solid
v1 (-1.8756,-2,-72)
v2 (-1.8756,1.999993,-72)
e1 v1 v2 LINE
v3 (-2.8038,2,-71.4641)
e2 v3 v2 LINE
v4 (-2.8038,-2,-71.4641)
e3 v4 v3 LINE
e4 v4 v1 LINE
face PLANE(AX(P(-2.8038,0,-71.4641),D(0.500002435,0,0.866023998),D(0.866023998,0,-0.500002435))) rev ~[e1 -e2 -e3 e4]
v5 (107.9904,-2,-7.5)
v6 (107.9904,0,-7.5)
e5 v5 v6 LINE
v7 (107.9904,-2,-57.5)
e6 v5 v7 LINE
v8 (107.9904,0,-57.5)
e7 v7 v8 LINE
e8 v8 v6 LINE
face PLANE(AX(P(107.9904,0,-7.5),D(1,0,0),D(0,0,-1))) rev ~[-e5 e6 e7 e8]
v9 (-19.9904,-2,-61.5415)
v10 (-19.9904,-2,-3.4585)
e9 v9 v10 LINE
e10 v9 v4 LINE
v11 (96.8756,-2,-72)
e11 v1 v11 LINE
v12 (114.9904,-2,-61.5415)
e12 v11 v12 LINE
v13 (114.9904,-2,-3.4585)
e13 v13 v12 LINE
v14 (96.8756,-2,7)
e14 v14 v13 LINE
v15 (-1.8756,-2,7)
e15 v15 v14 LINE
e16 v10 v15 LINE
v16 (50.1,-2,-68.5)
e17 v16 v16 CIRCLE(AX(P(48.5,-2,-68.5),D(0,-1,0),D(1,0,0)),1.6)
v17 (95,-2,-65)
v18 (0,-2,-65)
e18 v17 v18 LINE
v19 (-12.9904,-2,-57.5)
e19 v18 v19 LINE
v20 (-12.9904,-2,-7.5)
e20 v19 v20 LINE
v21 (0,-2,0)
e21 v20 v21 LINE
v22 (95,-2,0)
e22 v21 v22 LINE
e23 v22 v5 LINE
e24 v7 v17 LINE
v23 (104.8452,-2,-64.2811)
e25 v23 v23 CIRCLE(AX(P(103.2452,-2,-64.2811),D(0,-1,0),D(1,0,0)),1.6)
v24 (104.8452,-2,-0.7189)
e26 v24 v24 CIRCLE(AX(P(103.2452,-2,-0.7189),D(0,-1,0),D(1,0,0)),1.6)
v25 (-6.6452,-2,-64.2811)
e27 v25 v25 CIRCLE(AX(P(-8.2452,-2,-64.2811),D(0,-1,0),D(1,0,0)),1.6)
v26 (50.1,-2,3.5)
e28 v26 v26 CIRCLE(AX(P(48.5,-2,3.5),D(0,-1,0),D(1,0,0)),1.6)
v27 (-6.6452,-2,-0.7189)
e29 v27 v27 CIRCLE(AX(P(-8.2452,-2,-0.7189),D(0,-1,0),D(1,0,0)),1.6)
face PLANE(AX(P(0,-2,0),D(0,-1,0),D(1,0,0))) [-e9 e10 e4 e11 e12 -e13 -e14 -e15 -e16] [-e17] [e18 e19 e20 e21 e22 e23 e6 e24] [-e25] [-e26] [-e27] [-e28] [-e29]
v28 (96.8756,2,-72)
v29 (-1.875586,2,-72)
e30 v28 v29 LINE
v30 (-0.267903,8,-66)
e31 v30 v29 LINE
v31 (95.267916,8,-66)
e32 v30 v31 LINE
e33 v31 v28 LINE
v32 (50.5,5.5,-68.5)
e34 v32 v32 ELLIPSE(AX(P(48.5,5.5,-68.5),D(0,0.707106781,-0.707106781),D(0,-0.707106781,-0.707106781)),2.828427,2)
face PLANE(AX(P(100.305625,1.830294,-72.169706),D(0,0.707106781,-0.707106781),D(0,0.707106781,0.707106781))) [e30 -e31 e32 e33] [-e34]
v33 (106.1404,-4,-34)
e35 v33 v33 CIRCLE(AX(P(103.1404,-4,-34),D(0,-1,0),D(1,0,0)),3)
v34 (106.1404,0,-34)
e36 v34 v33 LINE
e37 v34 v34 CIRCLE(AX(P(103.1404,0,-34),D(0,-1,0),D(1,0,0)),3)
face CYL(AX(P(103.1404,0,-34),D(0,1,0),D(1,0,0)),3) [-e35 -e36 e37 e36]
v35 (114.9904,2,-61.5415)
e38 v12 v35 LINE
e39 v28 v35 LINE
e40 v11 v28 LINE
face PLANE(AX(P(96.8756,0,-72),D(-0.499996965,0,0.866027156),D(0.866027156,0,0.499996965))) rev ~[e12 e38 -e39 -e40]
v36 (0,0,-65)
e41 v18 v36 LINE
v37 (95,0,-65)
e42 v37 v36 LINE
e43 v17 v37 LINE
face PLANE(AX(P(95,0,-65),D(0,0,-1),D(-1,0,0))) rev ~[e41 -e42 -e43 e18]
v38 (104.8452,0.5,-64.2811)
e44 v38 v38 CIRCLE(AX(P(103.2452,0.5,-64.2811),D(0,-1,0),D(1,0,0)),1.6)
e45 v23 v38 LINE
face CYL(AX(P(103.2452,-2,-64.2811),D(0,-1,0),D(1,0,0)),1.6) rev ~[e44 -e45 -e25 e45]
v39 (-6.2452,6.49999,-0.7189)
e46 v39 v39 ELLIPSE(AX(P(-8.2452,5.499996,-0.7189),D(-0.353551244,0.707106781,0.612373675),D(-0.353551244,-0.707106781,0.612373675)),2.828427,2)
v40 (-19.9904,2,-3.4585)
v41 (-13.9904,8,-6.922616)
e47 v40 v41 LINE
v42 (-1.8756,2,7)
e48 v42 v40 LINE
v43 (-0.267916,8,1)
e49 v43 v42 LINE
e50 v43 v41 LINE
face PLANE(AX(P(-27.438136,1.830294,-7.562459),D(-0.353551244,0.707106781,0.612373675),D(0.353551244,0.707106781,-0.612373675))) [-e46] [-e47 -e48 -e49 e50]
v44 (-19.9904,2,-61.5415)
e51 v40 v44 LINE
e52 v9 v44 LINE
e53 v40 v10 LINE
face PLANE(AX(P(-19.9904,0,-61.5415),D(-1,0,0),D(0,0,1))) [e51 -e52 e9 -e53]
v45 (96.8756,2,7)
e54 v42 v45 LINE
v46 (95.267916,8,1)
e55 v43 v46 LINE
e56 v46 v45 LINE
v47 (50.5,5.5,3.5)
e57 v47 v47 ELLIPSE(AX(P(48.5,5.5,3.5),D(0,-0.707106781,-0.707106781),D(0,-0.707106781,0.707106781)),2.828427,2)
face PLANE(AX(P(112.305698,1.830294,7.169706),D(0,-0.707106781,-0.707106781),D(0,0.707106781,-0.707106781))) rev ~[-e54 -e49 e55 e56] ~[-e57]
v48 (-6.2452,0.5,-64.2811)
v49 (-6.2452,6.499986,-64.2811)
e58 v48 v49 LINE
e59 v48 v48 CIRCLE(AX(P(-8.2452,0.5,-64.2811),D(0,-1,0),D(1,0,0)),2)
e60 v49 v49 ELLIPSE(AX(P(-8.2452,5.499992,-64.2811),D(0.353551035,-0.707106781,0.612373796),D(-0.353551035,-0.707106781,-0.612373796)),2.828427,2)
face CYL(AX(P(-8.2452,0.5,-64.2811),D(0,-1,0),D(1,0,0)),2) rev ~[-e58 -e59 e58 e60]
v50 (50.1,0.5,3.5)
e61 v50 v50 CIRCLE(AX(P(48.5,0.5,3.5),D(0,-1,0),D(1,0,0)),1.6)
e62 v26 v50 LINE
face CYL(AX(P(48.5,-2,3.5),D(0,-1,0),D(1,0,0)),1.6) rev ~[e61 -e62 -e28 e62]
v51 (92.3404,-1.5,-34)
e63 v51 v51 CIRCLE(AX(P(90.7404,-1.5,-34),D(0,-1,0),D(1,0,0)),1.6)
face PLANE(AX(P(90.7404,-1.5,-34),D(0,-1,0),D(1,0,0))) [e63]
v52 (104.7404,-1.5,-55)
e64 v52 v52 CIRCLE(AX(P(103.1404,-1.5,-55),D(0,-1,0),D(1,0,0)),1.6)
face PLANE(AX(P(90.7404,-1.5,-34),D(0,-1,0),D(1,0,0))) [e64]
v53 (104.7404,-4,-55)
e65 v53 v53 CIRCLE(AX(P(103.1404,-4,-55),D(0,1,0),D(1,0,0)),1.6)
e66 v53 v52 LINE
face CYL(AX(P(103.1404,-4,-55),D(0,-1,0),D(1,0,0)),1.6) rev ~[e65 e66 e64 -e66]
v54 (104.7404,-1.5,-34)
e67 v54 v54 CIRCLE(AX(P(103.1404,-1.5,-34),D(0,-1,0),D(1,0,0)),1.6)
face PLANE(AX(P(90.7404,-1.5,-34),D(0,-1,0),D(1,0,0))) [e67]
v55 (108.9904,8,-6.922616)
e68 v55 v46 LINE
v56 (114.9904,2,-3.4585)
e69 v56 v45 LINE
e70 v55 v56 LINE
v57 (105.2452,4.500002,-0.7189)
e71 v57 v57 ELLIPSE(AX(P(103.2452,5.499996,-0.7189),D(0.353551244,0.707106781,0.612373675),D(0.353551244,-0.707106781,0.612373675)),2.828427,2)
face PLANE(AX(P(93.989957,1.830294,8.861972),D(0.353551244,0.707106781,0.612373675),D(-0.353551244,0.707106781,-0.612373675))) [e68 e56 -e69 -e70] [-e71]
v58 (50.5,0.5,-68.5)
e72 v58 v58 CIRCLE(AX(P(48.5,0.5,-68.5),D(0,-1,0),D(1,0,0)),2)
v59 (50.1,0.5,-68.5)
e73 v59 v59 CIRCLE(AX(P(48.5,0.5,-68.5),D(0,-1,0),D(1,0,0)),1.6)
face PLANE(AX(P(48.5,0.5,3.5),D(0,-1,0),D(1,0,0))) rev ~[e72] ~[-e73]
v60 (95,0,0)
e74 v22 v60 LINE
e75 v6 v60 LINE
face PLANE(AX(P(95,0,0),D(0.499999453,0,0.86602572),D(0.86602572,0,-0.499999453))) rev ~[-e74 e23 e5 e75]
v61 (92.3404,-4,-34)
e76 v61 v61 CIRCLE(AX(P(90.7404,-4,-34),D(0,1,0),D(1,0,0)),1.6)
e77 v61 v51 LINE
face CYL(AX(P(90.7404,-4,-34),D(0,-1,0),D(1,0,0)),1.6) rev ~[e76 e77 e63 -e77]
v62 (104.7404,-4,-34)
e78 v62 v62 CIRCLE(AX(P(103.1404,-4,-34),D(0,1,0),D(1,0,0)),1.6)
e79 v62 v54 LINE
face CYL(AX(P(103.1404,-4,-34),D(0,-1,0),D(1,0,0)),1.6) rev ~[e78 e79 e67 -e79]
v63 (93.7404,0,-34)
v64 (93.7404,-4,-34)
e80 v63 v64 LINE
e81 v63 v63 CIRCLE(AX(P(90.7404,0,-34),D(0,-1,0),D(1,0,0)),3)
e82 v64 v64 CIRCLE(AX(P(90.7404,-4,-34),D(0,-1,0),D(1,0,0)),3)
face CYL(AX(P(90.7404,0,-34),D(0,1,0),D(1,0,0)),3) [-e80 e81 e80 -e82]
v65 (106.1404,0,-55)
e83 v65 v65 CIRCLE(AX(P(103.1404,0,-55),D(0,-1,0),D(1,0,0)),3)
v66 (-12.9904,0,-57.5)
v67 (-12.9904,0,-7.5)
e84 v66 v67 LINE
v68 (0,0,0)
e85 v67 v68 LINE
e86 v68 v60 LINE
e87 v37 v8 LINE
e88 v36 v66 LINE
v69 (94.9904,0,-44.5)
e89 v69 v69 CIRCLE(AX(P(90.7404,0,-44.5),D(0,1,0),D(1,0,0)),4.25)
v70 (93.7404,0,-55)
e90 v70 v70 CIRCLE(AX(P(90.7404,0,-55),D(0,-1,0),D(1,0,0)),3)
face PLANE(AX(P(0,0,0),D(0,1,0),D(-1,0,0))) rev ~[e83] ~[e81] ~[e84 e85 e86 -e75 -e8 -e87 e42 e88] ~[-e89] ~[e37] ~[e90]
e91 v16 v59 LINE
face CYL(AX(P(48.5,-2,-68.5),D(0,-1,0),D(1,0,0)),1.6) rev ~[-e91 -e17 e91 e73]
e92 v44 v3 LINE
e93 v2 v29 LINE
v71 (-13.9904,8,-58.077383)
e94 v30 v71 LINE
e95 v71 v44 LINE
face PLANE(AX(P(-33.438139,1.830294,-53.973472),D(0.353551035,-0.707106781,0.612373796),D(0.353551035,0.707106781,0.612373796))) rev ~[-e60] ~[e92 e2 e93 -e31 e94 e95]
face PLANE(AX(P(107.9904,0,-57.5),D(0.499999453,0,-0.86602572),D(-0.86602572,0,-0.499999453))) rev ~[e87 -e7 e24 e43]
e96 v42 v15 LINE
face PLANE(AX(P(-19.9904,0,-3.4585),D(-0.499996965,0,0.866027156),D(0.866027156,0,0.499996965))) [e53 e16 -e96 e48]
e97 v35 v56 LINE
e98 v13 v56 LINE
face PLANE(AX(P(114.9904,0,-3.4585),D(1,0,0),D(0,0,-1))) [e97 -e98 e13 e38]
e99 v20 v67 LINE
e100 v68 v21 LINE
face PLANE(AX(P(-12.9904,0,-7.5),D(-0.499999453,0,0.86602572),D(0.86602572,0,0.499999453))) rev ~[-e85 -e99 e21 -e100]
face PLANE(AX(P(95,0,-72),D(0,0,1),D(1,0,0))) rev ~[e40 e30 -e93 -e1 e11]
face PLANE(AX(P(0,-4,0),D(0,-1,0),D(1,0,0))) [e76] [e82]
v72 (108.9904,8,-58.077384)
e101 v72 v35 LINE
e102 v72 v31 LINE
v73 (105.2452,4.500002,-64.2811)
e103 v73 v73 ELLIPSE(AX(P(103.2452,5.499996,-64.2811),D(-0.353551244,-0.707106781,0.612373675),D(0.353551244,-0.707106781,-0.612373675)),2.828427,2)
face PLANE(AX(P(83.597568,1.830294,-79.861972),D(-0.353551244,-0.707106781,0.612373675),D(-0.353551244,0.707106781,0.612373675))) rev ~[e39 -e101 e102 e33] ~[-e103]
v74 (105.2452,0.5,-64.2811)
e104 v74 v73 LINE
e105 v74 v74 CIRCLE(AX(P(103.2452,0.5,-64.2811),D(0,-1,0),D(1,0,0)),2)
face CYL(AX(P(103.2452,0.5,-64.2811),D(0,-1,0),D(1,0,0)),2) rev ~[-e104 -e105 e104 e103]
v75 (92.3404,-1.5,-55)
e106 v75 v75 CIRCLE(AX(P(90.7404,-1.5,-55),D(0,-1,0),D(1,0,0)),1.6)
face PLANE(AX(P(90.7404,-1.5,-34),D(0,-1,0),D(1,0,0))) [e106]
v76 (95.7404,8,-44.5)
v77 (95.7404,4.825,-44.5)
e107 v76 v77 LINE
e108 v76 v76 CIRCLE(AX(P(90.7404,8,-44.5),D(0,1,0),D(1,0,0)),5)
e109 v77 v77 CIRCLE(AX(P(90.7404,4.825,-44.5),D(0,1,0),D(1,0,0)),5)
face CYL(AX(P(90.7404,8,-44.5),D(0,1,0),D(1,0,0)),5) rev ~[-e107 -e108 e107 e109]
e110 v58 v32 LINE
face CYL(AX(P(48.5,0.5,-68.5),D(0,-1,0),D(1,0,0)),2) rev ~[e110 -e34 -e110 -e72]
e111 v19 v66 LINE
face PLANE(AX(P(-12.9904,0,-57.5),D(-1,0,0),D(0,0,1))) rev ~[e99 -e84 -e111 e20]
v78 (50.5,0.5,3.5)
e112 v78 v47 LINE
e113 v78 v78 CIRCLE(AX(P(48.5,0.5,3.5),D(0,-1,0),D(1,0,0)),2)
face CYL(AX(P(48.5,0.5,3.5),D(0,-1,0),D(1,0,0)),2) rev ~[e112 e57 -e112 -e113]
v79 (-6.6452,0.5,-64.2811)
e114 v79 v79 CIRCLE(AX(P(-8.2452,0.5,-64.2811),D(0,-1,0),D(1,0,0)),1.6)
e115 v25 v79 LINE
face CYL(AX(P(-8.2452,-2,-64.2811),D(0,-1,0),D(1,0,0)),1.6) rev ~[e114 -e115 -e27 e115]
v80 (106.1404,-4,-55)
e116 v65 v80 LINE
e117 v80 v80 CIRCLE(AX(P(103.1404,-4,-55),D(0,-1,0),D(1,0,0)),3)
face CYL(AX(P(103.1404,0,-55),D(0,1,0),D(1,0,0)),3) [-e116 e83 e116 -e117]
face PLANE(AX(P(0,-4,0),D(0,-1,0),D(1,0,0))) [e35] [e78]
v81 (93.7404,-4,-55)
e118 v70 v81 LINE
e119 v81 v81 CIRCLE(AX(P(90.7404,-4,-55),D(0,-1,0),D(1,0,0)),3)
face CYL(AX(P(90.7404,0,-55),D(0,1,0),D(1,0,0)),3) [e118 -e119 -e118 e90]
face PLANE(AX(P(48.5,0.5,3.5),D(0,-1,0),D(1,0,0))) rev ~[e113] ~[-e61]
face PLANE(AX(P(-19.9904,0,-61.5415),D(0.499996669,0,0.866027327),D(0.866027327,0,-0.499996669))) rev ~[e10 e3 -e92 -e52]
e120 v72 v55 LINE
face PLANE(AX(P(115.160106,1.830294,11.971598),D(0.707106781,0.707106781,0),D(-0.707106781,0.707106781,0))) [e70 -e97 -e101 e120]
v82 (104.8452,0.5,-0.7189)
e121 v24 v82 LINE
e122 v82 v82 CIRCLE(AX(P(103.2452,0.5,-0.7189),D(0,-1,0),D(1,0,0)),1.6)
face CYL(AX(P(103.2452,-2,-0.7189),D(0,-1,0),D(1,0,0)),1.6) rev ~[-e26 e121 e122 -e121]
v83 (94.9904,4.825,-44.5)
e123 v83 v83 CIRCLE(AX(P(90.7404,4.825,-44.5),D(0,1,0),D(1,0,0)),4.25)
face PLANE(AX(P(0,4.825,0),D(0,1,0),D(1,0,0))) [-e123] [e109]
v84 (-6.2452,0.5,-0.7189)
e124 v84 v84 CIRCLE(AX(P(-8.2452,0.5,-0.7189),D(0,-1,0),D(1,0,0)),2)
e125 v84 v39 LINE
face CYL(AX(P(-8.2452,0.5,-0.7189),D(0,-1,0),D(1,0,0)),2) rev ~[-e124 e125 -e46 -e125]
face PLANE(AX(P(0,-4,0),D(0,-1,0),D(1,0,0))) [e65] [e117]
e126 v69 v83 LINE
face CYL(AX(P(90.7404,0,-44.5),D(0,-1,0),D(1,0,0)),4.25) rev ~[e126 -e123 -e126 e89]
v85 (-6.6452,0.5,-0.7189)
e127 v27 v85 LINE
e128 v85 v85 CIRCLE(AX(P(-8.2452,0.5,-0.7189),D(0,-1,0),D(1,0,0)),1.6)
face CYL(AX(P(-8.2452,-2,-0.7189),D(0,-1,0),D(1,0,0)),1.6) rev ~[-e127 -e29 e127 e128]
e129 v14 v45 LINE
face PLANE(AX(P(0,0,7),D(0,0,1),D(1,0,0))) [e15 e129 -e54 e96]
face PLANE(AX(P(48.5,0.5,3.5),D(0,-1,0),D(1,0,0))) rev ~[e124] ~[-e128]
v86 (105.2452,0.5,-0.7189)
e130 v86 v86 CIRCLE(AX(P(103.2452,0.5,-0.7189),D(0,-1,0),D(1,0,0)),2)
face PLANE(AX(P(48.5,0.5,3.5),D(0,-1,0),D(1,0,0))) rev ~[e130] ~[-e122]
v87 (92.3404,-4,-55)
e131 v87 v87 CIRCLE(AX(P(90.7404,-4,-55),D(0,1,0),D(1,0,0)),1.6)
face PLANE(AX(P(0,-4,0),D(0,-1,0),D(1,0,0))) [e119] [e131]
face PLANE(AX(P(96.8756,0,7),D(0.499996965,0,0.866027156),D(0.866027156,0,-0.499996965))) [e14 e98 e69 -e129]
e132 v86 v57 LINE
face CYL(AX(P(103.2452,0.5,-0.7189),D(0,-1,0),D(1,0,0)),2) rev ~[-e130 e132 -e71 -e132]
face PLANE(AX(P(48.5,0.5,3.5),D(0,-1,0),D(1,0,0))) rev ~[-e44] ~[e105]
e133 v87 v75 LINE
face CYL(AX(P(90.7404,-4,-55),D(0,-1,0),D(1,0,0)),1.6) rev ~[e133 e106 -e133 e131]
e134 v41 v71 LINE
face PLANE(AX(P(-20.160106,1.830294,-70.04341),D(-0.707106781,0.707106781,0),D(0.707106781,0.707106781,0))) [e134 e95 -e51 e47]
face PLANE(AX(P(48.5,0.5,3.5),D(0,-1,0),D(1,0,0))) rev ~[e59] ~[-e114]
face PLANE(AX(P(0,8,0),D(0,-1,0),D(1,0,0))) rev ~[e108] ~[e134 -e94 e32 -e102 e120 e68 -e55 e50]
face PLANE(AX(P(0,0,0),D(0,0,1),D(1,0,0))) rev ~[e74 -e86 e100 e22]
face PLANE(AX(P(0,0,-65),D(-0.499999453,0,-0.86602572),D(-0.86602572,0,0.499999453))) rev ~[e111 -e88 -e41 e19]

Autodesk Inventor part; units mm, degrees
ref_plane "YZ Plane" through (0, 0, 0) normal (1, 0, 0) x (0, 1, 0)
ref_plane "XZ Plane" through (0, 0, 0) normal (0, 1, 0) x (-1, 0, 0)
sketch "Sketch5" plane through (0, 0, 0) normal (0, 1, 0) x (-1, 0, 0)
  line L0 (0, 0) -> (-95, 0)
  line L1 (-95, 0) -> (-95, -65)
  line L2 (-95, -65) -> (0, -65)
  line L3 (0, -65) -> (0, 0)
  line L4 (0, -65) -> (12.9904, -57.5)
  line L5 (12.9904, -57.5) -> (12.9904, -7.5)
  line L6 (12.9904, -7.5) -> (0, 0)
  line L7 (-95, -65) -> (-107.9904, -57.5)
  line L8 (-107.9904, -57.5) -> (-107.9904, -7.5)
  line L9 (-107.9904, -7.5) -> (-95, 0)
  dimension "d23" = 95
  dimension "d24" = 65
  dimension "d25" = 15
  dimension "d26" = 15
  dimension "d27" = 120
  dimension "d28" = 15
  dimension "d29" = 15
  dimension "d30" = 120
extrude "Extrusion3" add sketch "Sketch5" along normal blind 8
sketch "Sketch6" plane through (0, 0, 0) normal (0, -1, 0) x (1, 0, 0)
  line L0 (0, 7) -> (87, 7)
  line L1 (95, -72) -> (8, -72)
  line L2 (0, 0) -> (95, 0) projected
  line L3 (95, -65) -> (0, -65) projected
  line L4 (96.8756, 7) -> (114.9904, -3.4585)
  line L5 (95, 0) -> (107.9904, -7.5) projected
  line L6 (114.9904, -3.4585) -> (114.9904, -61.5415)
  line L7 (107.9904, -7.5) -> (107.9904, -57.5) projected
  line L8 (96.8756, -72) -> (114.9904, -61.5415)
  line L9 (107.9904, -57.5) -> (95, -65) projected
  line L10 (107.9904, -57.5) -> (95, -65) projected
  line L11 (87, 7) -> (96.8756, 7)
  line L12 (95, -72) -> (96.8756, -72)
  line L13 (0, 7) -> (-1.8756, 7)
  line L14 (-19.9904, -3.4585) -> (-1.8756, 7)
  line L15 (-19.9904, -61.5415) -> (-2.8038, -71.4641)
  line L16 (0, -65) -> (-12.9904, -57.5) projected
  line L17 (-12.9904, -7.5) -> (0, 0) projected
  line L18 (-19.9904, -61.5415) -> (-19.9904, -3.4585)
  line L19 (-12.9904, -57.5) -> (-12.9904, -7.5) projected
  line L20 (0, -65) -> (-12.9904, -57.5) projected
  line L21 (-12.9904, -7.5) -> (-12.9904, -57.5)
  line L22 (-12.9904, -57.5) -> (0, -65)
  line L23 (95, -65) -> (0, -65) projected
  line L24 (0, -65) -> (95, -65)
  line L25 (95, -65) -> (107.9904, -57.5)
  line L26 (107.9904, -7.5) -> (107.9904, -57.5)
  line L27 (95, 0) -> (107.9904, -7.5) projected
  line L28 (107.9904, -7.5) -> (95, 0)
  line L29 (0, 0) -> (-12.9904, -7.5)
  line L30 (95, 0) -> (0, 0)
  line L31 (8, -72) -> (-1.8756, -72)
  line L32 (-2.8038, -71.4641) -> (-1.8756, -72)
  dimension "d33" = 7
  dimension "d34" = 7
  dimension "d35" = 7
  dimension "d36" = 7
  dimension "d37" = 7
  dimension "d38" = 7
  dimension "d39" = 7
  dimension "d40" = 7
extrude "Extrusion4" add sketch "Sketch6" along normal blind 2 and the other way blind 8
chamfer "Chamfer1" distance 6 angle 45 8 edges at (47.5, 8, 7) (-10.933, 8, 1.7707) (-19.9904, 8, -32.5) (-10.933, 8, -66.7707) (47.5, 8, -72) (105.933, 8, -66.7707) (114.9904, 8, -32.5) (105.933, 8, 1.7707)
sketch "Sketch7" plane through (0, 0, 0) normal (0, -1, 0) x (1, 0, 0)
  line L0 (86.4904, -40.25) -> (94.9904, -40.25)
  line L1 (94.9904, -40.25) -> (94.9904, -48.75)
  line L2 (94.9904, -48.75) -> (86.4904, -48.75)
  line L3 (86.4904, -48.75) -> (86.4904, -40.25)
  line L4 (96.8756, 7) -> (-1.8756, 7) projected
  line L5 (114.9904, -61.5415) -> (114.9904, -3.4585) projected
  circle A0 centre (90.7404, -55) radius 3
  circle A1 centre (90.7404, -34) radius 3
  circle A2 centre (103.1404, -34) radius 3
  circle A3 centre (103.1404, -55) radius 3
  circle A4 centre (90.7404, -44.5) radius 4.25
  circle A5 centre (46.5, 2.8174) radius 1.834
  circle A6 centre (46.5, -64.297) radius 1.834
  line L6 (-1.8756, -72) -> (96.8756, -72) projected
  point P0 (0, 0)
  dimension "d48" = 8.5
  dimension "d50" = 20
  dimension "d51" = 6.25
  dimension "d52" = 8.15
  dimension "d53" = 12.4
  dimension "d54" = 0
  dimension "d55" = 21
  dimension "d56" = 12.4
  dimension "d57" = 0
  dimension "d58" = 0
  dimension "d59" = 6
  dimension "d61" = 8.5
  dimension "d107" = 27.5
sketch "Sketch9" plane through (0, -2, 0) normal (0, -1, 0) x (1, 0, 0)
  circle A0 centre (-8.2452, -0.7189) radius 1.6
  line L0 (0, -65) -> (-12.9904, -57.5) projected
  line L1 (0, -65) -> (-1.8756, -72) projected
  line L2 (95, -65) -> (0, -65) projected
  line L3 (107.9904, -7.5) -> (107.9904, -57.5) projected
  line L4 (0, 0) -> (95, 0) projected
  line L5 (-12.9904, -7.5) -> (-16.4904, -1.4378)
  line L6 (-19.9904, -3.4585) -> (-1.8756, 7) projected
  line L7 (0, 0) -> (-3.5, 6.0622)
  line L8 (-12.9904, -57.5) -> (-19.9904, -61.5415) projected
  line L9 (-12.9904, -57.5) -> (-15.4904, -61.8301)
  line L10 (0, -65) -> (-2.5, -69.3301)
  line L11 (95, -65) -> (97.5, -69.3301)
  line L12 (95, 0) -> (98.5, 6.0622)
  line L13 (96.8756, 7) -> (114.9904, -3.4585) projected
  line L14 (107.9904, -7.5) -> (114.9904, -3.4585) projected
  line L15 (107.9904, -7.5) -> (111.4904, -1.4378)
  line L16 (107.9904, -57.5) -> (111.4904, -63.5622)
  line L17 (96.8756, -72) -> (114.9904, -61.5415) projected
  line L18 (107.9904, -57.5) -> (95, -65) projected
  line L19 (95, 0) -> (107.9904, -7.5) projected
  circle A1 centre (-8.2452, -64.2811) radius 1.6
  circle A2 centre (103.2452, -64.2811) radius 1.6
  circle A3 centre (103.2452, -0.7189) radius 1.6
  circle A4 centre (48.5, 3.5) radius 1.6
  circle A5 centre (48.5, -68.5) radius 1.6
  line L20 (95, -65) -> (95, -72)
  line L21 (-1.8756, -72) -> (96.8756, -72) projected
  line L22 (95, 0) -> (95, 7)
  line L23 (96.8756, 7) -> (-1.8756, 7) projected
  dimension "d62" = 90
  dimension "d63" = 90
  dimension "d64" = 90
  dimension "d65" = 7.5
  dimension "d66" = 3.5
  dimension "d67" = 3.2
  dimension "d68" = 7.5
  dimension "d69" = 3.5
  dimension "d70" = 3.5
  dimension "d71" = 7.5
  dimension "d72" = 7.5
  dimension "d73" = 3.5
  dimension "d76" = 3.5
  dimension "d77" = 46.5
  dimension "d78" = 3.5
  dimension "d79" = 46.5
extrude "Extrusion6" cut sketch "Sketch9" against normal blind 2.5 contours A0 | A1 | A2 | A3 | A4 | A5
sketch "Sketch13" plane through (48.5, 0.5, 3.5) normal (0, -1, 0) x (1, 0, 0)
  circle A0 centre (0, 0) radius 2
  circle A1 centre (54.7452, -4.2189) radius 2
  circle A2 centre (54.7452, -67.7811) radius 2
  circle A3 centre (0, -72) radius 2
  circle A4 centre (-56.7452, -67.7811) radius 2
  circle A5 centre (-56.7452, -4.2189) radius 2
  circle A6 centre (-56.7452, -4.2189) radius 1.6 projected
  circle A7 centre (0, 0) radius 1.6 projected
  circle A8 centre (54.7452, -4.2189) radius 1.6 projected
  circle A9 centre (54.7452, -67.7811) radius 1.6 projected
  circle A10 centre (0, -72) radius 1.6 projected
  circle A11 centre (-56.7452, -67.7811) radius 1.6 projected
  point P0 (-48.5, -3.5)
  dimension "d90" = 4
  dimension "d91" = 4
  dimension "d92" = 4
  dimension "d93" = 4
  dimension "d94" = 4
  dimension "d95" = 4
extrude "Extrusion7" cut sketch "Sketch13" against normal blind 10 contours A0 | A1 | A2 | A3 | A4 | A5 | A6 | A7 | A8 | A9 | A10 | A11
extrude "Extrusion8" add sketch "Sketch7" along normal blind 4 contours A0 | A1 | A2 | A3
sketch "Sketch14" plane through (0, 0, 0) normal (0, -1, 0) x (1, 0, 0)
  line L0 (86.4904, -48.75) -> (94.9904, -48.75)
  line L1 (94.9904, -48.75) -> (94.9904, -40.25)
  line L2 (94.9904, -40.25) -> (86.4904, -40.25)
  line L3 (86.4904, -40.25) -> (86.4904, -48.75)
  line L4 (95, -65) -> (0, -65) projected
  line L5 (107.9904, -7.5) -> (107.9904, -57.5) projected
  circle A0 centre (90.7404, -44.5) radius 4.25
  circle A1 centre (90.7404, -55) radius 3 projected
  point P0 (0, 0)
  dimension "d100" = 8.5
  dimension "d101" = 8.5
  dimension "d103" = 13
  dimension "d104" = 8.5
  dimension "d108" = 9.25
extrude "Extrusion9" cut sketch "Sketch14" against normal blind 10 contours A0
ref_plane "Work Plane1" through (0, -6, 0) normal (0, -1, 0) x (1, 0, 0)
sketch "Sketch15" plane through (90.7404, -4, -34) normal (0, -1, 0) x (1, 0, 0)
  circle A0 centre (0, 0) radius 1.6
  circle A1 centre (12.4, 0) radius 1.6
  line L0 (12.4, 0) -> (0, 0)
  line L1 (0, 0) -> (0, -21)
  line L2 (0, -21) -> (12.4, -21)
  line L3 (12.4, -21) -> (12.4, 0)
  circle A2 centre (12.4, -21) radius 1.6
  circle A3 centre (0, -21) radius 1.6
  point P0 (-90.7404, 34)
  dimension "d110" = 3.2
  dimension "d111" = 3.2
  dimension "d112" = 12.4
  dimension "d113" = 21
  dimension "d114" = 3.2
  dimension "d115" = 3.2
extrude "Extrusion10" cut sketch "Sketch15" against normal blind 2.5 contours L0 L1 A0 | A0 L1 L0 | L0 L3 A1 | A1 L3 L0 | A3 L2 L1 | L1 L2 A3 | A2 L2 L3 | L3 L2 A2
sketch "Sketch16" plane through (0, 8, 0) normal (0, 1, 0) x (1, 0, 0)
  circle A0 centre (90.7404, 44.5) radius 5
  circle A1 centre (90.7404, 44.5) radius 4.25 projected
  point P0 (0, 0)
  dimension "d118" = 10
extrude "Extrusion11" cut sketch "Sketch16" against normal blind 3.175
properties part number "Topv5"
